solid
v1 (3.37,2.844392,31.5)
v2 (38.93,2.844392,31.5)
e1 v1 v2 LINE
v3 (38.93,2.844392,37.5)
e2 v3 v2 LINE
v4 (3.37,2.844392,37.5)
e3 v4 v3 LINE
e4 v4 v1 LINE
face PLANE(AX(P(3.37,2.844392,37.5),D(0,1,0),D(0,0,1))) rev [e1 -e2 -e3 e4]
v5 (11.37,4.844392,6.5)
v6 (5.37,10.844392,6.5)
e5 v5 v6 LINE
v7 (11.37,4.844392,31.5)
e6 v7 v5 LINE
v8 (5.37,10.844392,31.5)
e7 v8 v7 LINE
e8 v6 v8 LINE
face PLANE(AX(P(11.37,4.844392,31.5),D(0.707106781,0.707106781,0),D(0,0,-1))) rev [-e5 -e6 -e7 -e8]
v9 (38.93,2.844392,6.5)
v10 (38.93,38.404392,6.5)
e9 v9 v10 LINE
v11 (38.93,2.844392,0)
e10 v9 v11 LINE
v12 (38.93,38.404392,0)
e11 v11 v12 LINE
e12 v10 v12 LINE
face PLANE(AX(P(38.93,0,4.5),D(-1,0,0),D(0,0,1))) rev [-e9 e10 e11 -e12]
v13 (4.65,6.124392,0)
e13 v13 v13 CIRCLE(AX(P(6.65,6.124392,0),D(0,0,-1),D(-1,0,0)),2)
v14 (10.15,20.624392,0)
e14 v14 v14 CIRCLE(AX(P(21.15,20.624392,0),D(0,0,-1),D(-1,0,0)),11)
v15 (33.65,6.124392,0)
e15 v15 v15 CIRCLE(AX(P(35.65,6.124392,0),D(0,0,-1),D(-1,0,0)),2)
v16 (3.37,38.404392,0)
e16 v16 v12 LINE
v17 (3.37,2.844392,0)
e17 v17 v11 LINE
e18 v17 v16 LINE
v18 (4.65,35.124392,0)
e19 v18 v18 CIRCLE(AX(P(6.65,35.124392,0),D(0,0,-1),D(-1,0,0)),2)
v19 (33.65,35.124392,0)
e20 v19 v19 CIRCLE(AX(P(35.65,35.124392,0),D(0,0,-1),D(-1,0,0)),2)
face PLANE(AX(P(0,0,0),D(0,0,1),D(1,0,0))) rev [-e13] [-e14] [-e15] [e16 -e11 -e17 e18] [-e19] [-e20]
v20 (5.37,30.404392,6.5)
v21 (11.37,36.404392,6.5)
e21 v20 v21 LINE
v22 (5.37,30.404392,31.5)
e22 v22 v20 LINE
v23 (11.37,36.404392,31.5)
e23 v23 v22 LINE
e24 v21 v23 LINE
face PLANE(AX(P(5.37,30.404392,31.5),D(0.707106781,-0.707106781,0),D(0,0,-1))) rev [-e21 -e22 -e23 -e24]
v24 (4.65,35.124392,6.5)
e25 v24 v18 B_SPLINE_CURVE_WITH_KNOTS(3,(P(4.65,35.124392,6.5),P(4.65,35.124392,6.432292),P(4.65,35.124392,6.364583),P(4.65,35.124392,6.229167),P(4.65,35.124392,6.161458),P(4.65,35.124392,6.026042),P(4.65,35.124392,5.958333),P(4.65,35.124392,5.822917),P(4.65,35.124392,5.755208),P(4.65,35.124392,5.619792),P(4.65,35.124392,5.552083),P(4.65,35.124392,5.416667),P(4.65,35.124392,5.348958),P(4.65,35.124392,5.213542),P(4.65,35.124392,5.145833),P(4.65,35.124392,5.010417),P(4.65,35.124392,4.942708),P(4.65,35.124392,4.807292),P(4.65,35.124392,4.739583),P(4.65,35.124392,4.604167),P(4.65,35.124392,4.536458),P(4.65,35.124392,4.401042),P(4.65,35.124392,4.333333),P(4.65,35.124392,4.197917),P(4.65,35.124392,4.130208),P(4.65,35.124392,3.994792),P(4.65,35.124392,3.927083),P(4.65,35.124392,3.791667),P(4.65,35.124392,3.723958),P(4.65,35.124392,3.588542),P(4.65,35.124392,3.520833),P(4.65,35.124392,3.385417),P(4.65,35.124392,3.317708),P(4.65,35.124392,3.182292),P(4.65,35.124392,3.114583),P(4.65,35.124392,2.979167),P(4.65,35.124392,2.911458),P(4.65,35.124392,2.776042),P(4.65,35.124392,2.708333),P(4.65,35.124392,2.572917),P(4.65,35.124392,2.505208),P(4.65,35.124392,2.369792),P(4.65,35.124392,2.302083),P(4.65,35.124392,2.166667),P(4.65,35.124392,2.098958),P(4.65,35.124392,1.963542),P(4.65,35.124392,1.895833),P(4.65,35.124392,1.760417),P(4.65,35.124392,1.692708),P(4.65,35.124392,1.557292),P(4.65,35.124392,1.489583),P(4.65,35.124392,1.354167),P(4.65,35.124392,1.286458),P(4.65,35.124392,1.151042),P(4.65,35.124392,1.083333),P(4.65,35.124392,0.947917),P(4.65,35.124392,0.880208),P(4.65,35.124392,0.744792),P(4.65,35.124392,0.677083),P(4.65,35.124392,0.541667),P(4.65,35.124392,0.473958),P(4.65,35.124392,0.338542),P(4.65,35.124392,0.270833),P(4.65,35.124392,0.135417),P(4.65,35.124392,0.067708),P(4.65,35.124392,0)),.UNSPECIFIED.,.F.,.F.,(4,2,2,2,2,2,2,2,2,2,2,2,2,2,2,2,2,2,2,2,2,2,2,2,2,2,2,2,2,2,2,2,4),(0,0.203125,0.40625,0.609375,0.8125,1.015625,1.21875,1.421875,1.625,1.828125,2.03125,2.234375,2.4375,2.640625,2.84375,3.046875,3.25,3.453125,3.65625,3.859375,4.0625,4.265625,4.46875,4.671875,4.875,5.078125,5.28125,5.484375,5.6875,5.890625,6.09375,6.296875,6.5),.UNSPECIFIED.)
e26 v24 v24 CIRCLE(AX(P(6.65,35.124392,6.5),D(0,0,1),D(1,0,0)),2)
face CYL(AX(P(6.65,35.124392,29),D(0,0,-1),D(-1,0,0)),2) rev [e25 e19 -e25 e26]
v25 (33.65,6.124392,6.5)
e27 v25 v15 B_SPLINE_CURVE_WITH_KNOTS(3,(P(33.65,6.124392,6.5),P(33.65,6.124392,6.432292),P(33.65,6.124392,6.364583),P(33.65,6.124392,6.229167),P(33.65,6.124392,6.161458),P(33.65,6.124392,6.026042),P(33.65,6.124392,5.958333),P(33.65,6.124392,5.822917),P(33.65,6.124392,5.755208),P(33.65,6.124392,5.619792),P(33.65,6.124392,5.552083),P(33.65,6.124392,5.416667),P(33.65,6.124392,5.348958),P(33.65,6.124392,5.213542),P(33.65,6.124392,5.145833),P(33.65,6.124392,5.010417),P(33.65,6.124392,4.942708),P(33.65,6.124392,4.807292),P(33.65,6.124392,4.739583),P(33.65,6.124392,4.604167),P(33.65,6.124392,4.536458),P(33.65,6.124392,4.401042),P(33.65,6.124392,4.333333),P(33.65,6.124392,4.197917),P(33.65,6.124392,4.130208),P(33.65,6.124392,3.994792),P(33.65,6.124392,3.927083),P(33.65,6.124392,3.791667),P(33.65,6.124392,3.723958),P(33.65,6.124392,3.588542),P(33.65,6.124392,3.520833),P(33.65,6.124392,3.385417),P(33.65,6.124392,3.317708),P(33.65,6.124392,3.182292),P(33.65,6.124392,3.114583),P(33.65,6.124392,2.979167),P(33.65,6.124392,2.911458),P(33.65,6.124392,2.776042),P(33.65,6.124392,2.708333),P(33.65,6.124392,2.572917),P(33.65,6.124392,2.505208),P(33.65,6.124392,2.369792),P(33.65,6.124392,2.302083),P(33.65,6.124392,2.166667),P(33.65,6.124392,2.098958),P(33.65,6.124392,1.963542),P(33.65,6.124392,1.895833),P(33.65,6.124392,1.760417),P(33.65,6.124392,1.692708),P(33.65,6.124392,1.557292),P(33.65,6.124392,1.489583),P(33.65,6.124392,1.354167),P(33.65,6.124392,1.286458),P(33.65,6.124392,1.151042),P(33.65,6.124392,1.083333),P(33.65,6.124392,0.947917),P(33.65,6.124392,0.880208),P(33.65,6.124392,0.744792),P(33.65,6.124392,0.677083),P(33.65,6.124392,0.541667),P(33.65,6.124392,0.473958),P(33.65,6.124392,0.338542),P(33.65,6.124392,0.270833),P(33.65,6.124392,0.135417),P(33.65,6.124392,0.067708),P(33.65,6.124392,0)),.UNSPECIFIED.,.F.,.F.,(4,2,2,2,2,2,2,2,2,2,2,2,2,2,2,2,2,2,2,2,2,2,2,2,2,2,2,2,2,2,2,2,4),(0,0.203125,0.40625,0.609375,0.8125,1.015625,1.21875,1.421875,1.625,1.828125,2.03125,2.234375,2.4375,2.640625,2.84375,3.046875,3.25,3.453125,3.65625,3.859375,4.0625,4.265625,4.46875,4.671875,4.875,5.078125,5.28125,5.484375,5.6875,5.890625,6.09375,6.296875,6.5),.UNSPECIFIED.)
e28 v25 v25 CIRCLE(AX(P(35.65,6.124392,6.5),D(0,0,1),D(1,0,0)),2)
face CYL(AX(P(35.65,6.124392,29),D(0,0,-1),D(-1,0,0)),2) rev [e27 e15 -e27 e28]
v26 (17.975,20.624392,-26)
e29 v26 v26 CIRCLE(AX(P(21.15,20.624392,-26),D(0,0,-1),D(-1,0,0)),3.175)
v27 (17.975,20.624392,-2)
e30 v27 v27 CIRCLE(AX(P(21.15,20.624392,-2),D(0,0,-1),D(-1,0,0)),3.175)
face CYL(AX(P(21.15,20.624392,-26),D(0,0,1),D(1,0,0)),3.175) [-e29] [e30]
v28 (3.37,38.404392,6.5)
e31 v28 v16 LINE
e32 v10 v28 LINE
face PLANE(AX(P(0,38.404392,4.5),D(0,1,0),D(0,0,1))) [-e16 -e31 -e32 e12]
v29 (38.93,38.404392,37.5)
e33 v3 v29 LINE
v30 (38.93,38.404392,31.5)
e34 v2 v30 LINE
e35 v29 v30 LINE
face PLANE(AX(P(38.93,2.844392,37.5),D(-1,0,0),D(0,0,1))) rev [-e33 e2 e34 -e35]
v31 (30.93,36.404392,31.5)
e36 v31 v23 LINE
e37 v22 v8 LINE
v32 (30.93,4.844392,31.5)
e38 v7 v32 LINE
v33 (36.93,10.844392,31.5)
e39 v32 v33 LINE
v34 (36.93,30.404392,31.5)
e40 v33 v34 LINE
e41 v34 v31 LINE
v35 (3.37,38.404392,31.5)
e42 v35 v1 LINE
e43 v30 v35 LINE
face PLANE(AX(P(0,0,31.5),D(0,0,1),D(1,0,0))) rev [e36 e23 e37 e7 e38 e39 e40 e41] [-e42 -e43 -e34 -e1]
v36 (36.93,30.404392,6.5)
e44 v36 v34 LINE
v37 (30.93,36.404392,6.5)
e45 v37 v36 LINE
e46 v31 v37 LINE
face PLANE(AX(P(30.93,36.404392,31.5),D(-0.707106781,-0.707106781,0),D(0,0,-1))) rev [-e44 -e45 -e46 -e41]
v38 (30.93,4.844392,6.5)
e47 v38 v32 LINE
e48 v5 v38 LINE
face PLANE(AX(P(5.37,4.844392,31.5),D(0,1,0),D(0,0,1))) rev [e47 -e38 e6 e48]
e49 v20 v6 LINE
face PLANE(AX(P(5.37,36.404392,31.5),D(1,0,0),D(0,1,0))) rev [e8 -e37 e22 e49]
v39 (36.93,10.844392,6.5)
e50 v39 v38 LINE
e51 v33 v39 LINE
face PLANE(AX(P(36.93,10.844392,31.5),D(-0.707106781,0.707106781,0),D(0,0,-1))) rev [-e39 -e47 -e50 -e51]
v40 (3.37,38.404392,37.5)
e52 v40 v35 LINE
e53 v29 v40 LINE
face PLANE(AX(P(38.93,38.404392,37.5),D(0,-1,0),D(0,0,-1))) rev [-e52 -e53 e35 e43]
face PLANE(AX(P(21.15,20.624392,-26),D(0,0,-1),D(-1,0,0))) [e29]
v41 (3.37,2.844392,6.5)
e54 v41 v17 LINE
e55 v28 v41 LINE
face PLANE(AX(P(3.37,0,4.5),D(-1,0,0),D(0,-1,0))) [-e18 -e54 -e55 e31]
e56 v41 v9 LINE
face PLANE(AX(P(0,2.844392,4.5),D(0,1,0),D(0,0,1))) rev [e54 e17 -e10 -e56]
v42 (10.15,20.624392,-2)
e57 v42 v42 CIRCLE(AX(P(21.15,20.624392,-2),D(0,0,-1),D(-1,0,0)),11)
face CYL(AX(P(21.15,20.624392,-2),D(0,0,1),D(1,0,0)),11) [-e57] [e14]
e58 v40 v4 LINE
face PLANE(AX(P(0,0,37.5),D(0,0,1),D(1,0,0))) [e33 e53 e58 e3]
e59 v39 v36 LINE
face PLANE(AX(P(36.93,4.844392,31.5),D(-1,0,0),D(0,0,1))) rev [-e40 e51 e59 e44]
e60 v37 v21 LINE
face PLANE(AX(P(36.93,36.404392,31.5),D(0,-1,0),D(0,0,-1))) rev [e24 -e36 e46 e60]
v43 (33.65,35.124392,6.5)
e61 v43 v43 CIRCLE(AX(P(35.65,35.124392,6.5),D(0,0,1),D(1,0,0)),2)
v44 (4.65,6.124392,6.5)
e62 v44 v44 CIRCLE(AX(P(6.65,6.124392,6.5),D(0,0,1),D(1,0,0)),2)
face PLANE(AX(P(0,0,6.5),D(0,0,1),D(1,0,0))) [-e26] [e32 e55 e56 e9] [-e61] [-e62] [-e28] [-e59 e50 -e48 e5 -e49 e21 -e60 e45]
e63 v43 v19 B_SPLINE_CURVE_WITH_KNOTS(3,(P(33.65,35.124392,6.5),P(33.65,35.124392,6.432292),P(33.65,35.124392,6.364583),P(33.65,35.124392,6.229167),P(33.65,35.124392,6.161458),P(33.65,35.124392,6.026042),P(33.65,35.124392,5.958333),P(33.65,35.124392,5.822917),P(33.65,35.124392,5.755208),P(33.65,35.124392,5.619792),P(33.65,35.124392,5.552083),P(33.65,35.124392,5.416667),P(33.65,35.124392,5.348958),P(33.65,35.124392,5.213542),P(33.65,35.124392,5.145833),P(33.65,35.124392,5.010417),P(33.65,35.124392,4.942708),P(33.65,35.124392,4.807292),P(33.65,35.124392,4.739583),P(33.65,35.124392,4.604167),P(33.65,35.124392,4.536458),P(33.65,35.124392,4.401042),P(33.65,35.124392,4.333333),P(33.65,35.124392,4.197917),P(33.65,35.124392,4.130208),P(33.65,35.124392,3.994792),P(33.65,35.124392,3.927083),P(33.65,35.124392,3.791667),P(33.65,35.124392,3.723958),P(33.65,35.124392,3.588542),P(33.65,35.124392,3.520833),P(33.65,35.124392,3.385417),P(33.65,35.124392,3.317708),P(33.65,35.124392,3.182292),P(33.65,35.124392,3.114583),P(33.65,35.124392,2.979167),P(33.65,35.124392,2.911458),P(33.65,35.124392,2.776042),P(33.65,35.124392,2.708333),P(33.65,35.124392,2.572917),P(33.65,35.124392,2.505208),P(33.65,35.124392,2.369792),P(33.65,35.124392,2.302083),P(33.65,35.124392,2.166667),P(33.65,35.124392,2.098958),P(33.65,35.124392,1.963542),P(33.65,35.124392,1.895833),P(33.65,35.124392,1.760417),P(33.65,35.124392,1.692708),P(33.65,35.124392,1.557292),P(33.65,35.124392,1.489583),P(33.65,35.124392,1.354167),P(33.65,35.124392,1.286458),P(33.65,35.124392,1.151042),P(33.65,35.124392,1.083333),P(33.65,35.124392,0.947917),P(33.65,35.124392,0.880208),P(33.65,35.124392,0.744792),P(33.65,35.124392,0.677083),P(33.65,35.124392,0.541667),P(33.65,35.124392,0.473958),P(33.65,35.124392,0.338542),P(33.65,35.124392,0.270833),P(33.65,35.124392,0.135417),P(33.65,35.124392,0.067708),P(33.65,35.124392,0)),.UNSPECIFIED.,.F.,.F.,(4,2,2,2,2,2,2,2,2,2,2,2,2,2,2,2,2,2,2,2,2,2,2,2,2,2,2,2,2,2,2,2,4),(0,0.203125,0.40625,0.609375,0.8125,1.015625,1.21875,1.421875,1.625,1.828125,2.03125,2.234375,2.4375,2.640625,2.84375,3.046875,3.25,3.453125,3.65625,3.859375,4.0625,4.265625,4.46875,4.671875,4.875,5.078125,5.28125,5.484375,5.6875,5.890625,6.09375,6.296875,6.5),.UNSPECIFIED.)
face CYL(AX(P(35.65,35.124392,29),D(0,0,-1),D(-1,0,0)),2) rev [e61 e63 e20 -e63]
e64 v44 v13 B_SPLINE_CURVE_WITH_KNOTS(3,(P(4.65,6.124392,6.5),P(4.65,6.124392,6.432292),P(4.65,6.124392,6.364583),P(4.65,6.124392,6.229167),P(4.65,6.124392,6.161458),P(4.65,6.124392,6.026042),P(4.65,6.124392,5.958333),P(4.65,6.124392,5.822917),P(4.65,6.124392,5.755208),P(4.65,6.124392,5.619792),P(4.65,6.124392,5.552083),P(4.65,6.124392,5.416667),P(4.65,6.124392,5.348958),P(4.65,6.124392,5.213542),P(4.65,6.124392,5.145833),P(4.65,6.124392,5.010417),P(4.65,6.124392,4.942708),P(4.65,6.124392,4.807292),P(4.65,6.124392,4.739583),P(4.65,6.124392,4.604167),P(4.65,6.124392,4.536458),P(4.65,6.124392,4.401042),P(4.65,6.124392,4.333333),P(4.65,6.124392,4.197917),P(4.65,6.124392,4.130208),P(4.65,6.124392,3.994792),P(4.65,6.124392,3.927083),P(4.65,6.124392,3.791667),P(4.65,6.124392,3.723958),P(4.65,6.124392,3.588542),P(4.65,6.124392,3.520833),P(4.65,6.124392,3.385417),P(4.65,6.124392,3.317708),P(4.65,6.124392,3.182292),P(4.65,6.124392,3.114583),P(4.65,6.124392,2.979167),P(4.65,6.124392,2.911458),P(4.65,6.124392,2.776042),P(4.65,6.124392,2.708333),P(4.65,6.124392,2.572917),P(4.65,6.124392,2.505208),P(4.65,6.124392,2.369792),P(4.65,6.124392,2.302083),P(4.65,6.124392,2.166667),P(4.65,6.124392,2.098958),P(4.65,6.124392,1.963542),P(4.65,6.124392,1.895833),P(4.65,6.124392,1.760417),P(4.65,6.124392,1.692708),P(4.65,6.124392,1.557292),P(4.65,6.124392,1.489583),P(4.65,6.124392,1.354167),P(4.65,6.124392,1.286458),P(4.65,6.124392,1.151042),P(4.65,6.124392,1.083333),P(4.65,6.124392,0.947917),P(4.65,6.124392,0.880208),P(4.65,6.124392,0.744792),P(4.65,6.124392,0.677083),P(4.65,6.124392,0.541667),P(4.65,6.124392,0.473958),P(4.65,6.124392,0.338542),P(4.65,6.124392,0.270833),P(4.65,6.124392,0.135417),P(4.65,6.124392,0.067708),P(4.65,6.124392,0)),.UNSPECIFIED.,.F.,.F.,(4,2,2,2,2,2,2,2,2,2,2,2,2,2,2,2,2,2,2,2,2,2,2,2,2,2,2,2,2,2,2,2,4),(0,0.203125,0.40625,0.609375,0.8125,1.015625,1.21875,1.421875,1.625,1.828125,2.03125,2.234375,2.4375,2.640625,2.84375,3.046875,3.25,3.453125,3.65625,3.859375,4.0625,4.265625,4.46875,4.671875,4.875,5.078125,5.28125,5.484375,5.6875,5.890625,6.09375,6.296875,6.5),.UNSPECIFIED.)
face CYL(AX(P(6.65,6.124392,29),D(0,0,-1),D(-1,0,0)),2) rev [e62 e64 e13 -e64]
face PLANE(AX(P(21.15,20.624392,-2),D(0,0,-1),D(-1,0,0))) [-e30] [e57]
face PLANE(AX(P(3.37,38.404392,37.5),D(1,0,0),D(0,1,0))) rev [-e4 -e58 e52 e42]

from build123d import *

# Parameters (mm, degrees)
SKETCH1_W           = 35.56
SKETCH1_H           = 35.56
BOSS_EXTRUDE1_DEPTH = 4.5
SKETCH2_W           = 35.56
SKETCH2_H           = 35.56
BOSS_EXTRUDE2_DEPTH = 2
SKETCH5_R           = 11
BOSS_EXTRUDE5_DEPTH = 2
SKETCH6_R           = 3.175
BOSS_EXTRUDE6_DEPTH = 24
SKETCH7_R           = 2
CUT_EXTRUDE3_DEPTH  = 29
SKETCH8_W           = 31.56
SKETCH8_H           = 31.56
BOSS_EXTRUDE7_DEPTH = 25
SKETCH9_W           = 35.56
SKETCH9_H           = 35.56
BOSS_EXTRUDE8_DEPTH = 6
CHAMFER1_SIZE       = 6


with BuildPart() as part:
    # Sketch1 → Boss-Extrude1 (new body)
    with BuildSketch(Plane.XY):
        with Locations((21.15, 20.624391857)):
            Rectangle(SKETCH1_W, SKETCH1_H)
    extrude(amount=BOSS_EXTRUDE1_DEPTH)

    # Sketch2 → Boss-Extrude2 (add)
    with BuildSketch(Plane.XY.offset(4.5)):
        with Locations((21.15, 20.624391857)):
            Rectangle(SKETCH2_W, SKETCH2_H)
    extrude(amount=BOSS_EXTRUDE2_DEPTH)

    # Sketch5 → Boss-Extrude5 (add)
    with BuildSketch(Plane(origin=(0, 0, 0), x_dir=(-1, 0, 0), z_dir=(0, 0, -1))):
        with Locations((-21.15, 20.624391857)):
            Circle(SKETCH5_R)
    extrude(amount=BOSS_EXTRUDE5_DEPTH)

    # Sketch6 → Boss-Extrude6 (add)
    with BuildSketch(Plane(origin=(0, 0, -2), x_dir=(-1, 0, 0), z_dir=(0, 0, -1))):
        with Locations((-21.15, 20.624391857)):
            Circle(SKETCH6_R)
    extrude(amount=BOSS_EXTRUDE6_DEPTH)

    # Sketch7 → Cut-Extrude3 (cut)
    with BuildSketch(Plane(origin=(0, 0, 0), x_dir=(-1, 0, 0), z_dir=(0, 0, -1))):
        with Locations((-35.65, 6.124391857)):
            Circle(SKETCH7_R)
        with Locations((-6.65, 6.124391857)):
            Circle(SKETCH7_R)
        with Locations((-6.65, 35.124391857)):
            Circle(SKETCH7_R)
        with Locations((-35.65, 35.124391857)):
            Circle(SKETCH7_R)
    extrude(amount=-CUT_EXTRUDE3_DEPTH, mode=Mode.SUBTRACT)

    # Sketch8 → Boss-Extrude7 (add)
    with BuildSketch(Plane.XY.offset(6.5)):
        with Locations((21.15, 20.624391857)):
            Rectangle(SKETCH8_W, SKETCH8_H)
    extrude(amount=BOSS_EXTRUDE7_DEPTH)

    # Sketch9 → Boss-Extrude8 (add)
    with BuildSketch(Plane.XY.offset(31.5)):
        with Locations((21.15, 20.624391857)):
            Rectangle(SKETCH9_W, SKETCH9_H)
    extrude(amount=BOSS_EXTRUDE8_DEPTH)

    # Chamfer1
    # the kernel refuses this chamfer: 6 mm, written as the material it takes off along each edge
    with BuildSketch(Plane(origin=(5.37, 36.404391857, 6.5), x_dir=(0.9996219169112968, 0.02749587661058678, 0), z_dir=(0, 0, 1)), Plane(origin=(36.93, 4.844391857, 6.5), x_dir=(-0.9996219169112969, -0.027495876610586355, 0), z_dir=(0, 0, 1)), Plane(origin=(36.93, 36.404391857, 6.5), x_dir=(0.02749587661058678, -0.9996219169112968, 0), z_dir=(0, 0, 1))) as chamfer1_piece_1:
        Polygon((CHAMFER1_SIZE * 0.999621916911, -CHAMFER1_SIZE * 0.0274958766106), (-CHAMFER1_SIZE * 0.0274958766106, -CHAMFER1_SIZE * 0.999621916911), (0, 0), align=None)
    extrude(amount=25, mode=Mode.SUBTRACT)
    with BuildSketch(Plane(origin=(5.37, 4.844391857, 6.5), x_dir=(0.9996219169112969, -0.027495876610586348, 0), z_dir=(0, 0, 1))) as chamfer1_piece_2:
        Polygon((CHAMFER1_SIZE * 0.999621916911, CHAMFER1_SIZE * 0.0274958766106), (-CHAMFER1_SIZE * 0.0274958766106, CHAMFER1_SIZE * 0.999621916911), (0, 0), align=None)
    extrude(amount=25, mode=Mode.SUBTRACT)


solid = part.part
